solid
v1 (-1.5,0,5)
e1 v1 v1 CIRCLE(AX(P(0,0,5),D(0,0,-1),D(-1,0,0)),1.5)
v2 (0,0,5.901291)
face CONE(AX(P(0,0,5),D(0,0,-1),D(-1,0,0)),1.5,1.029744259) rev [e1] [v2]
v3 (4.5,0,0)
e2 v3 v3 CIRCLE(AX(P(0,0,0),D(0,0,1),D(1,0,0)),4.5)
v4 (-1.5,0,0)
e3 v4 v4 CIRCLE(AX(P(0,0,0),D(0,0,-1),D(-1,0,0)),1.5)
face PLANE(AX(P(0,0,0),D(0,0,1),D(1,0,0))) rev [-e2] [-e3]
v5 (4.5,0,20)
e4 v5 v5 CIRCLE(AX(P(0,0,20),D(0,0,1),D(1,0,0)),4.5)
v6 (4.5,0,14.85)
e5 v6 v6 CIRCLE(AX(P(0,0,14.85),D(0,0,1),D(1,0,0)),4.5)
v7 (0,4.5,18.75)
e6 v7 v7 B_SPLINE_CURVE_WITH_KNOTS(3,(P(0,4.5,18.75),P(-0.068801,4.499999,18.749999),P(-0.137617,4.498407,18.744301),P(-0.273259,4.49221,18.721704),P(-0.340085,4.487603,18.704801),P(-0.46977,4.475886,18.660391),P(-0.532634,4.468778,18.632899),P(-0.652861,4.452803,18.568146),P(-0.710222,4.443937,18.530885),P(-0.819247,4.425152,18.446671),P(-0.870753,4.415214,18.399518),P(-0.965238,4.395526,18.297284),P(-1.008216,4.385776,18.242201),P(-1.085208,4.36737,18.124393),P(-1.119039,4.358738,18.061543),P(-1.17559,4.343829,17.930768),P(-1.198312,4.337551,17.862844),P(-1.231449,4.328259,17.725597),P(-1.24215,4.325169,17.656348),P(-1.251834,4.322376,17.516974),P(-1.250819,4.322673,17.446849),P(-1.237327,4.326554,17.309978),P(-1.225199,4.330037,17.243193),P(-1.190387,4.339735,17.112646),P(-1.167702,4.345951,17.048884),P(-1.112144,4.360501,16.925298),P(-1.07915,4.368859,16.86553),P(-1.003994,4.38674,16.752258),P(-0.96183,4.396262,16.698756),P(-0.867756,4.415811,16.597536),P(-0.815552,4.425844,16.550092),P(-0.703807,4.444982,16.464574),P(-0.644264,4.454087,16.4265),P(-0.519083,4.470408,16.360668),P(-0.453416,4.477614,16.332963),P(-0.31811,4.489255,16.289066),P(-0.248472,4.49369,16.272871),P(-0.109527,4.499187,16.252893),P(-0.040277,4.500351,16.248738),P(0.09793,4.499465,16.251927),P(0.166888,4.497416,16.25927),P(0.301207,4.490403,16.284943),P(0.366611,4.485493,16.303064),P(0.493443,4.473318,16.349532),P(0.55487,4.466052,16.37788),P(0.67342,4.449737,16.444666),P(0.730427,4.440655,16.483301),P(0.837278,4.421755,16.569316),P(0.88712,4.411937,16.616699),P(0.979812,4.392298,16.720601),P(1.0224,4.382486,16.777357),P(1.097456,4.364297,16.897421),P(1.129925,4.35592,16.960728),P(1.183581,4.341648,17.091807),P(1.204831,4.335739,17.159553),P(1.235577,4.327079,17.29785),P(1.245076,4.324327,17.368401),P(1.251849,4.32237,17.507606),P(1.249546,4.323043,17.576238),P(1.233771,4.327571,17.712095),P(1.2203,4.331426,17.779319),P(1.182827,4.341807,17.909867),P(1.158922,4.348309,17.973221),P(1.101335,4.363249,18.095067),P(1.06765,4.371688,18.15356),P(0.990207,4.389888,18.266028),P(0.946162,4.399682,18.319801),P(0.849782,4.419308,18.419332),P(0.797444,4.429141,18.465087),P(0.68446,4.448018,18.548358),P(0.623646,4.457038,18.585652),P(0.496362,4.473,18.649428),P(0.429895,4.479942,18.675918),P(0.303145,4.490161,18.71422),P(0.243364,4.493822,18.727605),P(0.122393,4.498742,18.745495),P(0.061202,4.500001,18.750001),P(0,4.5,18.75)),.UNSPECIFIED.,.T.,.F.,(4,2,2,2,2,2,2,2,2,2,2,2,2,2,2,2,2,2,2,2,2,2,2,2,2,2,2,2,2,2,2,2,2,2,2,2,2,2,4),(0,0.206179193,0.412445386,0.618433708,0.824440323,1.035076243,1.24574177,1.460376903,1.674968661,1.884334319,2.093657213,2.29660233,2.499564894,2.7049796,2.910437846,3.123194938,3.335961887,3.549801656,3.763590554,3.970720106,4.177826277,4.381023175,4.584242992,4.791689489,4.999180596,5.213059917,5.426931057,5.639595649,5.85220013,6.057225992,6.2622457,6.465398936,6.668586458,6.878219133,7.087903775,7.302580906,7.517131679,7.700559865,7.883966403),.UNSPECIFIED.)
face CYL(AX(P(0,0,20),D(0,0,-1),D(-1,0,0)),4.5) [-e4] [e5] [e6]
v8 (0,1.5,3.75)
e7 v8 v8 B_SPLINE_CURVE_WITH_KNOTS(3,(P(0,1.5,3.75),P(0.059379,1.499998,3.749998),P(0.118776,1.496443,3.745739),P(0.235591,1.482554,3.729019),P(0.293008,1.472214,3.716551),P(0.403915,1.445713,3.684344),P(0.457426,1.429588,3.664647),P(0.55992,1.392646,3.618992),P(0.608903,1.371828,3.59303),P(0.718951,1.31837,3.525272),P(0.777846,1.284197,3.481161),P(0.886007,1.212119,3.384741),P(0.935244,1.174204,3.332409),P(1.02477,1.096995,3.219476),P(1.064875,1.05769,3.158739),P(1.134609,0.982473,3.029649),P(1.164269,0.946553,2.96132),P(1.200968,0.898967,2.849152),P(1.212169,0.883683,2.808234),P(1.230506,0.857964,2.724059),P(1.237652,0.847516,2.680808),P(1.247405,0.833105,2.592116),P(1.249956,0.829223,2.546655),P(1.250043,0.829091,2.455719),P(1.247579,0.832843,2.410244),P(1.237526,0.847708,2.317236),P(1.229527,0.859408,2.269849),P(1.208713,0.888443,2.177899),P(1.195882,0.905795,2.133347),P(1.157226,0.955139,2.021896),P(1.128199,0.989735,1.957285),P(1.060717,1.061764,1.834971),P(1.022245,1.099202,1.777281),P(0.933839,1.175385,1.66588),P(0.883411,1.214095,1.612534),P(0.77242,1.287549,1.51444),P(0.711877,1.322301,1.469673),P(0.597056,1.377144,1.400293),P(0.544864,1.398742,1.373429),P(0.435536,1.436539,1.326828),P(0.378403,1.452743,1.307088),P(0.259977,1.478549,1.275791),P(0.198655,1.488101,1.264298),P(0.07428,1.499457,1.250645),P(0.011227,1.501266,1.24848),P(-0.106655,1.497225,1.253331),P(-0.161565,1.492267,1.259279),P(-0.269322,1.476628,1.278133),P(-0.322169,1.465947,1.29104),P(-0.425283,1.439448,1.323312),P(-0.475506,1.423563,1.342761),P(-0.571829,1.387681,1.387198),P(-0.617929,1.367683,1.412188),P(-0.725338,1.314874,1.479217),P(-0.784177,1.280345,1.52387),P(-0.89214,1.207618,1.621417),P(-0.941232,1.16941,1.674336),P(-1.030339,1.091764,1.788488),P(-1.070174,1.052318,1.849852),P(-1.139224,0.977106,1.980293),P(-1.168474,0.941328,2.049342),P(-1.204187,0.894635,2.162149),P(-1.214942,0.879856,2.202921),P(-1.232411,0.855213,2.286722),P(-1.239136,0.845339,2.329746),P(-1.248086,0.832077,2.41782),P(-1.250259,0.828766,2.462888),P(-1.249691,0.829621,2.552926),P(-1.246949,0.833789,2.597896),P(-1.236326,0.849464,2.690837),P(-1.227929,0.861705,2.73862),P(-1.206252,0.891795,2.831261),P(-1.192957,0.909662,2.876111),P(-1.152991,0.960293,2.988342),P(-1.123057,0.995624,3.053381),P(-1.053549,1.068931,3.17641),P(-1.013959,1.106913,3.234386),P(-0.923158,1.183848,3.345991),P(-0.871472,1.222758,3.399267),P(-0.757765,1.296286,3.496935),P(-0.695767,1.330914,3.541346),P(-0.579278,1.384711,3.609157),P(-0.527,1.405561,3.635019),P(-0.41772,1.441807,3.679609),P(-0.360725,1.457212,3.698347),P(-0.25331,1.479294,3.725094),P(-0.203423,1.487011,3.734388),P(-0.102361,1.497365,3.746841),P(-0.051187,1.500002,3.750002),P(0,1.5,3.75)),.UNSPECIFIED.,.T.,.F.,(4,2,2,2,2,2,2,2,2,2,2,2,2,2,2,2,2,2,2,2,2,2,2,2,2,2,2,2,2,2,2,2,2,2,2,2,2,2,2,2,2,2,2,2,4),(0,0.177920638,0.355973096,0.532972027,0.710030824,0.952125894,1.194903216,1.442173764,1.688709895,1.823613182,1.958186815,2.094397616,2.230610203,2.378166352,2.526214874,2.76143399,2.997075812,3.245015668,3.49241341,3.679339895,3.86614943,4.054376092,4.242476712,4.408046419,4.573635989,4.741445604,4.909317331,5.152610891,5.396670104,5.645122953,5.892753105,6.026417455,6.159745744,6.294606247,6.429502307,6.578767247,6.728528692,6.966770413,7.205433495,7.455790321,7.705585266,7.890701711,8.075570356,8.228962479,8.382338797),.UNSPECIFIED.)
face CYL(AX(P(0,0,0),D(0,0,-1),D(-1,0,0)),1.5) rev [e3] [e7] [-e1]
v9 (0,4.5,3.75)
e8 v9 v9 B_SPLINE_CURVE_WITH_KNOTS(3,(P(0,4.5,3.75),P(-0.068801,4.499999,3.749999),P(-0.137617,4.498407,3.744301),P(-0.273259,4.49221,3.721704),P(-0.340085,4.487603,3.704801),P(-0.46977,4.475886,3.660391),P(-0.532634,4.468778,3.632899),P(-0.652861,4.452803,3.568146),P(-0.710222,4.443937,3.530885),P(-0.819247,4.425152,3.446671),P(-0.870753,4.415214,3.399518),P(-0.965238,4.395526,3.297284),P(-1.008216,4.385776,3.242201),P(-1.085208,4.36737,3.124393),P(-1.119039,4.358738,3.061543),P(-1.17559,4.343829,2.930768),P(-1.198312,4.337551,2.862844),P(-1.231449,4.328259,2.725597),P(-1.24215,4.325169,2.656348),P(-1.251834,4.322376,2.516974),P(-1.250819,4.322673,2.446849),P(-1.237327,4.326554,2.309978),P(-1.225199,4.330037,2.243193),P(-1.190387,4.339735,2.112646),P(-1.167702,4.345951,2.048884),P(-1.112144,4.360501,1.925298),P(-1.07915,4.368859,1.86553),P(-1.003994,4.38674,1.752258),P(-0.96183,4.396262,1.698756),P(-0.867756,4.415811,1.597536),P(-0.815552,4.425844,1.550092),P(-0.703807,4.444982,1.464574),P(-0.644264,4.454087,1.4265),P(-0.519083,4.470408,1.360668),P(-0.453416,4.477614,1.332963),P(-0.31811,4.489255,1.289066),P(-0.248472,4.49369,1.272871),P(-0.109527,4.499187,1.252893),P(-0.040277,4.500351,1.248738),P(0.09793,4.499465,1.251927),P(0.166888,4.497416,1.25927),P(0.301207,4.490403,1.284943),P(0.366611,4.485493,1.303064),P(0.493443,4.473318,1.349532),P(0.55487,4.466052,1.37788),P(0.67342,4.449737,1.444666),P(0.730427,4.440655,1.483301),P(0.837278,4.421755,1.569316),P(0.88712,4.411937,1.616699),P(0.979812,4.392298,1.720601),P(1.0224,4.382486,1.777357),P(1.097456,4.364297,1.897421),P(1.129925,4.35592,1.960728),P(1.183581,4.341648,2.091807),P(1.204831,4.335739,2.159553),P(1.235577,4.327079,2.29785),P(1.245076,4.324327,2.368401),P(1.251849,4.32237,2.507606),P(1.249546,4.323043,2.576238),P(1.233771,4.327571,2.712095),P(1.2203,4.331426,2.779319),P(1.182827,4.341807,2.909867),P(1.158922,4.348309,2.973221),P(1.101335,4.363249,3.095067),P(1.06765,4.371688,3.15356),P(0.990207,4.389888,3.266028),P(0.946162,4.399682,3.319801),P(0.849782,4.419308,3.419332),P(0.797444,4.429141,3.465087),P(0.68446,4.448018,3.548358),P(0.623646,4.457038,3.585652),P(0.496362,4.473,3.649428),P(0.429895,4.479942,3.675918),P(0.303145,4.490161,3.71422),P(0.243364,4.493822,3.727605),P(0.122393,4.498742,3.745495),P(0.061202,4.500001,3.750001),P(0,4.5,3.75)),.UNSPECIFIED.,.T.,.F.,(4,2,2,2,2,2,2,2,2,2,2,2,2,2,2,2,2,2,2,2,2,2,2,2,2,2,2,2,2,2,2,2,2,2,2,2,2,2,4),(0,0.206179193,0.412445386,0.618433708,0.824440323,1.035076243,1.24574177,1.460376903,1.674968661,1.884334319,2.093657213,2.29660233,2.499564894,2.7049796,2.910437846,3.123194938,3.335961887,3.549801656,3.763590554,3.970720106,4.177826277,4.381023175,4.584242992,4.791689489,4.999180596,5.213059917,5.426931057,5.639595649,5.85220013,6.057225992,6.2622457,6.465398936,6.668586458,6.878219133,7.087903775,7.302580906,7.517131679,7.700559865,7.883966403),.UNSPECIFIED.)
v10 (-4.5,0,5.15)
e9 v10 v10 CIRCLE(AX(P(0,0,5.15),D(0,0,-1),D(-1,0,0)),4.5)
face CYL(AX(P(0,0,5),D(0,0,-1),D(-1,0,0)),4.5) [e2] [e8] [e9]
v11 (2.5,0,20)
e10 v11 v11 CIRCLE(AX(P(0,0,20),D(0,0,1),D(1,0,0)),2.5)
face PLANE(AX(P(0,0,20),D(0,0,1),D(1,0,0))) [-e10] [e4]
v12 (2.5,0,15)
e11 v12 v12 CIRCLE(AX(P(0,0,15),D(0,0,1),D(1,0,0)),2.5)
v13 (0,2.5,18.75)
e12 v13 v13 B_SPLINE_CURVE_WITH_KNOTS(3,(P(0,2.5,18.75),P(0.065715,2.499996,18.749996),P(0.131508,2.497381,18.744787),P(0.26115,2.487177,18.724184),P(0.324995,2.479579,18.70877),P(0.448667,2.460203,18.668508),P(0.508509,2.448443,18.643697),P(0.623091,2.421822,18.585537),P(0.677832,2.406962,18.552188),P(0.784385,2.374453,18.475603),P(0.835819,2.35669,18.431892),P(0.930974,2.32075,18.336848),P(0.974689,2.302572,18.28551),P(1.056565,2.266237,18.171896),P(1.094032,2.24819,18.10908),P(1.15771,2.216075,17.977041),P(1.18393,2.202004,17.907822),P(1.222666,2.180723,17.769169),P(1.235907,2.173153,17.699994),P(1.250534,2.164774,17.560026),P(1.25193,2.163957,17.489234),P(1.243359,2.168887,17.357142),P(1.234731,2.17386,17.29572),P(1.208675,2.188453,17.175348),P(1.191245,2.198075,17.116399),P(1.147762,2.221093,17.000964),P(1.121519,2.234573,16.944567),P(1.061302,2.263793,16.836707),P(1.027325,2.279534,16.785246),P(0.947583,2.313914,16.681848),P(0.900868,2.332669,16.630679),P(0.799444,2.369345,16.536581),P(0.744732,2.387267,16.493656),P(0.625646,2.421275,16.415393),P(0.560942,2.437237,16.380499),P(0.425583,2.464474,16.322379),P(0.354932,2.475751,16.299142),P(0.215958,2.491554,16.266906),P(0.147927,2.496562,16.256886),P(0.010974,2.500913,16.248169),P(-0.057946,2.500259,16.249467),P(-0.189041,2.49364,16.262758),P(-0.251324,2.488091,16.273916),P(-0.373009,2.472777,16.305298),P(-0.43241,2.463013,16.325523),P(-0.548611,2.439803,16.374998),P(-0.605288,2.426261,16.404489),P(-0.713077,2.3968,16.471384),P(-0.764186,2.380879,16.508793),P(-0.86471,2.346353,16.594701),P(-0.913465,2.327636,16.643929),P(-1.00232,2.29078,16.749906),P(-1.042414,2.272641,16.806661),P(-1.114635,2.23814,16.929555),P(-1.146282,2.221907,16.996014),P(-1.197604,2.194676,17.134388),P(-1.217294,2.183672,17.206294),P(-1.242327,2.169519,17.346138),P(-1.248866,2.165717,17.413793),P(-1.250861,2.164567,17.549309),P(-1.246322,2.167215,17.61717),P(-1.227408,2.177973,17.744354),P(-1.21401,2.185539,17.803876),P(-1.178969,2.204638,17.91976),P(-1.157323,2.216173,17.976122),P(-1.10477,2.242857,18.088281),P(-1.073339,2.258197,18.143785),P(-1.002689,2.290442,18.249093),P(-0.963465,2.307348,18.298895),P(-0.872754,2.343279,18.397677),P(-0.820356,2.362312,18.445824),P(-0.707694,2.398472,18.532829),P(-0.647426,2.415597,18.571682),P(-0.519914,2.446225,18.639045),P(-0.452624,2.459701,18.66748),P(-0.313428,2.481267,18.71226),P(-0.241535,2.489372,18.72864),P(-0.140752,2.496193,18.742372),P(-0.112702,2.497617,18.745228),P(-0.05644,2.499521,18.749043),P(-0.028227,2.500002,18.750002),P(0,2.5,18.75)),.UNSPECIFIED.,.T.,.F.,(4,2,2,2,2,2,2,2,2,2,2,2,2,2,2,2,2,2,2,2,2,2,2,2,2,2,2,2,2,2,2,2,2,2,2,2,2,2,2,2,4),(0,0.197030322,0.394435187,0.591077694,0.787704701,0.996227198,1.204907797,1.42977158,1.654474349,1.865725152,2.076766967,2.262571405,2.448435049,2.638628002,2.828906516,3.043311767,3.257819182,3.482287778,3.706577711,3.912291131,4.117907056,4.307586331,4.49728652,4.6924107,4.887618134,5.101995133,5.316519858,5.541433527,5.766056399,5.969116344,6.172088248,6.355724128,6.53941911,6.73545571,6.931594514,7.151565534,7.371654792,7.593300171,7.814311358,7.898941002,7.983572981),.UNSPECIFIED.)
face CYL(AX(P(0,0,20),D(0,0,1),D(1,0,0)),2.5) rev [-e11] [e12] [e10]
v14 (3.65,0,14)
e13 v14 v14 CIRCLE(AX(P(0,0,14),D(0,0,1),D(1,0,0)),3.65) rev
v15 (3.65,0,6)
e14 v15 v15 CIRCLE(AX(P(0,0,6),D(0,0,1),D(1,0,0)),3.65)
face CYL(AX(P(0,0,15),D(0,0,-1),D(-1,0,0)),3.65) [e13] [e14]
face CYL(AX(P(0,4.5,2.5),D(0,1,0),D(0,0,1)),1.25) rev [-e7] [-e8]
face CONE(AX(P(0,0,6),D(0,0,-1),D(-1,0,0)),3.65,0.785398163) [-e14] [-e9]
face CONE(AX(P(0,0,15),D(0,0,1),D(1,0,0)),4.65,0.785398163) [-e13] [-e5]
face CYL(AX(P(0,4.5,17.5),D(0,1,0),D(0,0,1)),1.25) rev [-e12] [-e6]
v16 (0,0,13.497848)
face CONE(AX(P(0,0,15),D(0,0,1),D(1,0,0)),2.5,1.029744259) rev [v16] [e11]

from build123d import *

# Parameters (mm, degrees)
SKETCH_1_R                = 4.5
EXTRUDE_1_DEPTH           = 5
SKETCH_2_R                = 3.65
EXTRUDE_2_DEPTH           = 10
SKETCH_3_R                = 4.5
EXTRUDE_3_DEPTH           = 5
CHAMFER_2_SIZE            = 1
CHAMFER_3_SIZE            = 1
HOLE_WIZARD_5_0_5_1_D     = 5
HOLE_WIZARD_5_0_5_1_DEPTH = 5
HOLE_WIZARD_5_0_5_1_TIP   = 1.502151548
HOLE_WIZARD_3_0_3_1_D     = 3
HOLE_WIZARD_3_0_3_1_DEPTH = 5
HOLE_WIZARD_3_0_3_1_TIP   = 0.901290929
M3X0_5_1_REACH            = 24.389
M3X0_5_1_BORE_R           = 1.25


with BuildPart() as part:
    # 草圖1 → 填料-伸長1 (new body)
    with BuildSketch(Plane.XY):
        Circle(SKETCH_1_R)
    extrude(amount=EXTRUDE_1_DEPTH)

    # 草圖2 → 填料-伸長2 (add)
    with BuildSketch(Plane.XY.offset(5)):
        Circle(SKETCH_2_R)
    extrude(amount=EXTRUDE_2_DEPTH)

    # 草圖3 → 填料-伸長3 (add)
    with BuildSketch(Plane.XY.offset(15)):
        Circle(SKETCH_3_R)
    extrude(amount=EXTRUDE_3_DEPTH)

    # 導角2
    # the kernel refuses this chamfer: 1 mm, written as the material it adds along each edge
    with BuildSketch(Plane(origin=(0, 0, 5), x_dir=(1, 0, 0), z_dir=(0, -1, 0))) as chamfer_2_piece_1_section:
        Polygon((3.65, CHAMFER_2_SIZE), (3.65 + CHAMFER_2_SIZE, 0), (3.65, 0), align=None)
    chamfer_2_piece_1 = revolve(axis=Axis((0, 0, 5), (0, 0, 1)), mode=Mode.PRIVATE)
    chamfer_2_piece_1 = chamfer_2_piece_1 & Plane(origin=(0, 0, 5.572415942), x_dir=(1, 0, 0), z_dir=(0, 0, -1)) * Cylinder(4.5, 19, mode=Mode.PRIVATE)
    add(chamfer_2_piece_1)

    # 導角3
    # the kernel refuses this chamfer: 1 mm, written as the material it adds along each edge
    with BuildSketch(Plane(origin=(0, 0, 15), x_dir=(1, 0, 0), z_dir=(0, -1, 0))) as chamfer_3_piece_1_section:
        Polygon((3.65, -CHAMFER_3_SIZE), (3.65 + CHAMFER_3_SIZE, 0), (3.65, 0), align=None)
    chamfer_3_piece_1 = revolve(axis=Axis((0, 0, 15), (0, 0, 1)), mode=Mode.PRIVATE)
    chamfer_3_piece_1 = chamfer_3_piece_1 & Plane(origin=(0, 0, 14.427584058), x_dir=(1, 0, 0), z_dir=(0, 0, -1)) * Cylinder(4.5, 19, mode=Mode.PRIVATE)
    add(chamfer_3_piece_1)

    # Ø5.0 (5) 直徑孔1
    with Locations(Plane.XY.offset(20)):
        with Locations((0, 0)):
            Hole(HOLE_WIZARD_5_0_5_1_D / 2, depth=HOLE_WIZARD_5_0_5_1_DEPTH)
            with Locations((0, 0, -(HOLE_WIZARD_5_0_5_1_DEPTH + HOLE_WIZARD_5_0_5_1_TIP / 2))):  # 118° drill point
                Cone(0, HOLE_WIZARD_5_0_5_1_D / 2, HOLE_WIZARD_5_0_5_1_TIP, mode=Mode.SUBTRACT)

    # Ø3.0 (3) 直徑孔1
    with Locations(Plane(origin=(0, 0, 0), x_dir=(-1, 0, 0), z_dir=(0, 0, -1))):
        with Locations((0, 0)):
            Hole(HOLE_WIZARD_3_0_3_1_D / 2, depth=HOLE_WIZARD_3_0_3_1_DEPTH)
            with Locations((0, 0, -(HOLE_WIZARD_3_0_3_1_DEPTH + HOLE_WIZARD_3_0_3_1_TIP / 2))):  # 118° drill point
                Cone(0, HOLE_WIZARD_3_0_3_1_D / 2, HOLE_WIZARD_3_0_3_1_TIP, mode=Mode.SUBTRACT)

    # M3x0.5  螺絲攻的螺孔鑽1 bore → M3x0.5  螺絲攻的螺孔鑽1 (cut, up to next)
    with BuildSketch(Plane(origin=(0, 4.5, 0), x_dir=(1, 0, 0), z_dir=(0, 1, 0)), mode=Mode.PRIVATE) as m3x0_5_1_sk1:
        with Locations((0, -2.5)):
            Circle(M3X0_5_1_BORE_R)
    m3x0_5_1_tool1 = extrude(m3x0_5_1_sk1.sketch, amount=-M3X0_5_1_REACH, mode=Mode.PRIVATE) & part.part
    m3x0_5_1 = m3x0_5_1_tool1.solids().sort_by_distance((0, 4.5, 2.5))[0]
    add(m3x0_5_1, mode=Mode.SUBTRACT)

    # 鏡射1: M3x0.5  螺絲攻的螺孔鑽1 across plane
    add(m3x0_5_1.mirror(Plane(origin=(0, 0, 10), x_dir=(1, 0, 0), z_dir=(0, 0, -1))), mode=Mode.SUBTRACT)


solid = part.part
